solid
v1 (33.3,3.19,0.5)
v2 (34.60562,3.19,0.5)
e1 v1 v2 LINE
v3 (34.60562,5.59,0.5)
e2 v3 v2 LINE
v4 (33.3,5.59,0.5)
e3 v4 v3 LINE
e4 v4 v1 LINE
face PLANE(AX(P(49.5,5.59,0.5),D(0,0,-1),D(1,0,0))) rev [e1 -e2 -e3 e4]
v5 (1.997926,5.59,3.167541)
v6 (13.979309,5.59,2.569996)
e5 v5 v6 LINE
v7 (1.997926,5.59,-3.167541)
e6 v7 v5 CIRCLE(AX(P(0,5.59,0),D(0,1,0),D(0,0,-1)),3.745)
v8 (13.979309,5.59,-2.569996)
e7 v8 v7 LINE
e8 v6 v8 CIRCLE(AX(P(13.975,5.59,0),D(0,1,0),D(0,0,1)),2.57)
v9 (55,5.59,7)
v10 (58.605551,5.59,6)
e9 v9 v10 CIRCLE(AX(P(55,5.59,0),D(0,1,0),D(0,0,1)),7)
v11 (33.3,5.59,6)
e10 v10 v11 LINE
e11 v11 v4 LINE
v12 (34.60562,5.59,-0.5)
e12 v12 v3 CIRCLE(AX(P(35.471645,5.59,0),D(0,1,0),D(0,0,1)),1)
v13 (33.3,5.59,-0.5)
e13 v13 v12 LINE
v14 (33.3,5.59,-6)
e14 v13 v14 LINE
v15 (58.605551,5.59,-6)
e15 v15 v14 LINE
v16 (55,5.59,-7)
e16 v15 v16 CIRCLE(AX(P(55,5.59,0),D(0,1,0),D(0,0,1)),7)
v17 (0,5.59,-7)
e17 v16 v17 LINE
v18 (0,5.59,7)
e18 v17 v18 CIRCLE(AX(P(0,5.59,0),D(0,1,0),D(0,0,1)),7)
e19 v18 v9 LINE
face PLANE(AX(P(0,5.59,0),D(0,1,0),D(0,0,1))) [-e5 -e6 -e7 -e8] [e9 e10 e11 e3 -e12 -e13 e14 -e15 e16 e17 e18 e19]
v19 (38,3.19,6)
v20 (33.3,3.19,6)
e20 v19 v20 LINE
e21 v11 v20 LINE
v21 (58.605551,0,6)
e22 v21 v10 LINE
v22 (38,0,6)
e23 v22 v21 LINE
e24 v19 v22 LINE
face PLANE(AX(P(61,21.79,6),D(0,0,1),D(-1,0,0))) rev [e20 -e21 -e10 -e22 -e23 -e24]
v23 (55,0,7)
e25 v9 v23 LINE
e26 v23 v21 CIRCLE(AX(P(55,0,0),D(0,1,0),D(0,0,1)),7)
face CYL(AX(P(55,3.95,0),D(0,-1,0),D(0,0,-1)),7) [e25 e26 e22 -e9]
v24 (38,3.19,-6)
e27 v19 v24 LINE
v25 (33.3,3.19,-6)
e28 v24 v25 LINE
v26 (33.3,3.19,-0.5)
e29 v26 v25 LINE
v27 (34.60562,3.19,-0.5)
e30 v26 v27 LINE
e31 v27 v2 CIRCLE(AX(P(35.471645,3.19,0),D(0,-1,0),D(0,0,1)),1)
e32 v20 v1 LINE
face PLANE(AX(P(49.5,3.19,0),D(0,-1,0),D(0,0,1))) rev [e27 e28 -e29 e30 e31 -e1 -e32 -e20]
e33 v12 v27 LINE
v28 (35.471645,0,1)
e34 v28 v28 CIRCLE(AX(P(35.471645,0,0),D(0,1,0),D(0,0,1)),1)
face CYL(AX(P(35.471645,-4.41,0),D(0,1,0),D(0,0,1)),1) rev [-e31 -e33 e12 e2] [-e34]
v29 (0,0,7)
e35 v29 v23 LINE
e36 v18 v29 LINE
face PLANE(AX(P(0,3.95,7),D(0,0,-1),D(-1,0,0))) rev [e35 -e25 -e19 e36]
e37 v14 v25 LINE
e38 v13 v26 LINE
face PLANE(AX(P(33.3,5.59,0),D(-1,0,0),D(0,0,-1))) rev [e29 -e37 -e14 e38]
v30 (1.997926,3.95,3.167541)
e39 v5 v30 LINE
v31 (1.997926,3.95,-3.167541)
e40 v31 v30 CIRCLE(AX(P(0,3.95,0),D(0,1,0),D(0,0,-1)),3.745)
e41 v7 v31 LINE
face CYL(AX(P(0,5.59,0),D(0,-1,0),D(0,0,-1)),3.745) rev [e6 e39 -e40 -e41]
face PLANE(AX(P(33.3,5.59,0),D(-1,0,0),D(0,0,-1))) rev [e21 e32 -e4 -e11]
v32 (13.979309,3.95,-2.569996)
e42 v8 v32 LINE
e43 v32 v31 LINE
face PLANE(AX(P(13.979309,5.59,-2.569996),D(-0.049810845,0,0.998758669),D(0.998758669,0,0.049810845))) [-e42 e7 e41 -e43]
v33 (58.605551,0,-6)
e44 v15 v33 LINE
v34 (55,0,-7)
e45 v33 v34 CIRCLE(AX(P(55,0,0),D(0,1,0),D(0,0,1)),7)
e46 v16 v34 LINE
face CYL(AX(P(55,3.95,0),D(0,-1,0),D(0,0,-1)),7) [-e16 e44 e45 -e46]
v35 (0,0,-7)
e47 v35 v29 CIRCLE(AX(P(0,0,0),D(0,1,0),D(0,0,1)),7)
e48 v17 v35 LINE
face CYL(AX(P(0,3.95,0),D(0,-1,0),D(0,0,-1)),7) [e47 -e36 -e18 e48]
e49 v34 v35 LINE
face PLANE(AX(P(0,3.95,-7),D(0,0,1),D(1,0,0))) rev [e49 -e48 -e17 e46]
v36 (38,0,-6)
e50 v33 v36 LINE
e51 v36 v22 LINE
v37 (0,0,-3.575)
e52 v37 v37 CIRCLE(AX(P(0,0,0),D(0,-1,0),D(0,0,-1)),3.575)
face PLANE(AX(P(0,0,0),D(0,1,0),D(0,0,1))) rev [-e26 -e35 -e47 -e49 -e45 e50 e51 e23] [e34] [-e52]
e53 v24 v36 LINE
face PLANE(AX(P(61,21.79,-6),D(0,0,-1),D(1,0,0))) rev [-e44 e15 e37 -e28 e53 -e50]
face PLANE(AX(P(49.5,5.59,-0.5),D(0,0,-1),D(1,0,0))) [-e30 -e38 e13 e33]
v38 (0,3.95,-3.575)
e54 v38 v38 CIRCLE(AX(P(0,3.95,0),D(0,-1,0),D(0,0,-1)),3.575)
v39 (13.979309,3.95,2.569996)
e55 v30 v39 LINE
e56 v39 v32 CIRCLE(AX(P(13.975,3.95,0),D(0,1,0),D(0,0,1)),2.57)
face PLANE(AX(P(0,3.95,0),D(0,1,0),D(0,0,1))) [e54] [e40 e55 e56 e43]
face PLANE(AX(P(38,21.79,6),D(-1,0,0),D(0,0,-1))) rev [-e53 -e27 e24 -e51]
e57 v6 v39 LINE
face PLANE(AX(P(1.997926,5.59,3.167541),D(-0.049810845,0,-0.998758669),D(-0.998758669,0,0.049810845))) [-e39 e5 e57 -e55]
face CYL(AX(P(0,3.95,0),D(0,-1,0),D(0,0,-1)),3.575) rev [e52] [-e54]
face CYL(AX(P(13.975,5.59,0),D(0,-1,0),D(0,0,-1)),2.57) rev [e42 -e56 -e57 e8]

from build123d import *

# Parameters (mm, degrees)
BOSS_EXTRUDE1_DEPTH = 3.95
SKETCH2_R           = 3.575
CUT_EXTRUDE1_DEPTH  = 3.95
BOSS_EXTRUDE2_DEPTH = 1.64
SKETCH4_R           = 3.25
CUT_EXTRUDE2_DEPTH  = 63.643819328
CAVITY1_OUTLINE_R   = 3.25
CAVITY1_DEPTH       = 5.59
CAVITY1_START       = 3.19
CAVITY1_2_DEPTH     = 2.4
CUT_EXTRUDE4_DEPTH  = 63.643819328
CUT_EXTRUDE5_START  = -10
SKETCH6_R           = 1
CUT_EXTRUDE5_DEPTH  = 10


# Read off the part's stored shape, not the designer's step: Cavity1
with BuildPart() as part:
    # Sketch1 → Boss-Extrude1 (new body)
    with BuildSketch(Plane(origin=(0, 0, 0), x_dir=(1, 0, 0), z_dir=(0, 1, 0))):
        with BuildLine():
            Line((0, 7), (55, 7))
            ThreePointArc((55, 7), (62, 0), (55, -7))
            Line((55, -7), (0, -7))
            ThreePointArc((0, -7), (-7, 0), (0, 7))
        make_face()
    extrude(amount=BOSS_EXTRUDE1_DEPTH)

    # Sketch2 → Cut-Extrude1 (cut)
    with BuildSketch(Plane.XZ):
        with Locations(Location((0, 0, 0), (0, 0, 270))):
            Circle(SKETCH2_R)
    extrude(amount=-CUT_EXTRUDE1_DEPTH, mode=Mode.SUBTRACT)

    # Sketch3 → Boss-Extrude2 (add)
    with BuildSketch(Plane(origin=(0, 3.95, 0), x_dir=(1, 0, 0), z_dir=(0, 1, 0))):
        with BuildLine():
            Line((0, -7), (55, -7))
            ThreePointArc((55, -7), (62, 0), (55, 7))
            Line((55, 7), (0, 7))
            ThreePointArc((0, 7), (-7, 0), (0, -7))
        make_face()
        with BuildLine():
            Line((13.979308982, 2.569996388), (1.997926282, 3.167540934))
            ThreePointArc((1.997926282, 3.167540934), (-3.745, 0), (1.997926282, -3.167540934))
            Line((1.997926282, -3.167540934), (13.979308982, -2.569996388))
            ThreePointArc((13.979308982, -2.569996388), (16.545, 0), (13.979308982, 2.569996388))
        make_face(mode=Mode.SUBTRACT)
    extrude(amount=BOSS_EXTRUDE2_DEPTH)

    # Sketch4 → Cut-Extrude2 (cut, through all)
    with BuildSketch(Plane(origin=(0, 5.59, 0), x_dir=(1, 0, 0), z_dir=(0, 1, 0))):
        with Locations(Location((55, 0, 0), (0, 0, 270))):
            Circle(SKETCH4_R)
    extrude(amount=-CUT_EXTRUDE2_DEPTH, mode=Mode.SUBTRACT)

    # Cavity1 outline → Cavity1 (cut)
    with BuildSketch(Plane(origin=(0, 0, 0), x_dir=(1, 0, 0), z_dir=(0, 1, 0))):
        with BuildLine():
            Line((58.605551275, 6), (38, 6))
            Line((38, 6), (38, -6))
            Line((38, -6), (58.605551275, -6))
            ThreePointArc((58.605551275, -6), (59.949747468, -4.949747468), (61, -3.605551275))
            Line((61, -3.605551275), (61, 3.605551275))
            ThreePointArc((61, 3.605551275), (59.949747468, 4.949747468), (58.605551275, 6))
        make_face()
        with Locations((55, 0)):
            Circle(CAVITY1_OUTLINE_R, mode=Mode.SUBTRACT)
    extrude(amount=CAVITY1_DEPTH, mode=Mode.SUBTRACT)

    # Cavity1 2 outline → Cavity1 2 (cut)
    with BuildSketch(Plane(origin=(0, 0, 0), x_dir=(1, 0, 0), z_dir=(0, 1, 0)).offset(CAVITY1_START)):
        with BuildLine():
            Line((33.3, 0.5), (34.605619966, 0.5))
            ThreePointArc((34.605619966, 0.5), (36.47164537, 0), (34.605619966, -0.5))
            Line((34.605619966, -0.5), (33.3, -0.5))
            Line((33.3, -0.5), (33.3, -6))
            Line((33.3, -6), (38, -6))
            Line((38, -6), (38, 6))
            Line((38, 6), (33.3, 6))
            Line((33.3, 6), (33.3, 0.5))
        make_face()
        with BuildLine():
            ThreePointArc((61, -3.605551275), (62, 0), (61, 3.605551275))
            Line((61, 3.605551275), (61, -3.605551275))
        make_face()
    extrude(amount=CAVITY1_2_DEPTH, mode=Mode.SUBTRACT)

    # Sketch5 → Cut-Extrude4 (cut, through all)
    with BuildSketch(Plane.XZ):
        with BuildLine():
            Line((61, 3.605551275), (61, -3.605551275))
            ThreePointArc((61, -3.605551275), (62, 0), (61, 3.605551275))
        make_face()
    extrude(amount=-CUT_EXTRUDE4_DEPTH, mode=Mode.SUBTRACT)

    # Sketch6 → Cut-Extrude5 (cut)
    with BuildSketch(Plane(origin=(0, 5.59, 0), x_dir=(1, 0, 0), z_dir=(0, 1, 0)).offset(CUT_EXTRUDE5_START)):
        with Locations(Location((35.47164537, 0, 0), (0, 0, 270))):
            Circle(SKETCH6_R)
    extrude(amount=CUT_EXTRUDE5_DEPTH, mode=Mode.SUBTRACT)


solid = part.part
